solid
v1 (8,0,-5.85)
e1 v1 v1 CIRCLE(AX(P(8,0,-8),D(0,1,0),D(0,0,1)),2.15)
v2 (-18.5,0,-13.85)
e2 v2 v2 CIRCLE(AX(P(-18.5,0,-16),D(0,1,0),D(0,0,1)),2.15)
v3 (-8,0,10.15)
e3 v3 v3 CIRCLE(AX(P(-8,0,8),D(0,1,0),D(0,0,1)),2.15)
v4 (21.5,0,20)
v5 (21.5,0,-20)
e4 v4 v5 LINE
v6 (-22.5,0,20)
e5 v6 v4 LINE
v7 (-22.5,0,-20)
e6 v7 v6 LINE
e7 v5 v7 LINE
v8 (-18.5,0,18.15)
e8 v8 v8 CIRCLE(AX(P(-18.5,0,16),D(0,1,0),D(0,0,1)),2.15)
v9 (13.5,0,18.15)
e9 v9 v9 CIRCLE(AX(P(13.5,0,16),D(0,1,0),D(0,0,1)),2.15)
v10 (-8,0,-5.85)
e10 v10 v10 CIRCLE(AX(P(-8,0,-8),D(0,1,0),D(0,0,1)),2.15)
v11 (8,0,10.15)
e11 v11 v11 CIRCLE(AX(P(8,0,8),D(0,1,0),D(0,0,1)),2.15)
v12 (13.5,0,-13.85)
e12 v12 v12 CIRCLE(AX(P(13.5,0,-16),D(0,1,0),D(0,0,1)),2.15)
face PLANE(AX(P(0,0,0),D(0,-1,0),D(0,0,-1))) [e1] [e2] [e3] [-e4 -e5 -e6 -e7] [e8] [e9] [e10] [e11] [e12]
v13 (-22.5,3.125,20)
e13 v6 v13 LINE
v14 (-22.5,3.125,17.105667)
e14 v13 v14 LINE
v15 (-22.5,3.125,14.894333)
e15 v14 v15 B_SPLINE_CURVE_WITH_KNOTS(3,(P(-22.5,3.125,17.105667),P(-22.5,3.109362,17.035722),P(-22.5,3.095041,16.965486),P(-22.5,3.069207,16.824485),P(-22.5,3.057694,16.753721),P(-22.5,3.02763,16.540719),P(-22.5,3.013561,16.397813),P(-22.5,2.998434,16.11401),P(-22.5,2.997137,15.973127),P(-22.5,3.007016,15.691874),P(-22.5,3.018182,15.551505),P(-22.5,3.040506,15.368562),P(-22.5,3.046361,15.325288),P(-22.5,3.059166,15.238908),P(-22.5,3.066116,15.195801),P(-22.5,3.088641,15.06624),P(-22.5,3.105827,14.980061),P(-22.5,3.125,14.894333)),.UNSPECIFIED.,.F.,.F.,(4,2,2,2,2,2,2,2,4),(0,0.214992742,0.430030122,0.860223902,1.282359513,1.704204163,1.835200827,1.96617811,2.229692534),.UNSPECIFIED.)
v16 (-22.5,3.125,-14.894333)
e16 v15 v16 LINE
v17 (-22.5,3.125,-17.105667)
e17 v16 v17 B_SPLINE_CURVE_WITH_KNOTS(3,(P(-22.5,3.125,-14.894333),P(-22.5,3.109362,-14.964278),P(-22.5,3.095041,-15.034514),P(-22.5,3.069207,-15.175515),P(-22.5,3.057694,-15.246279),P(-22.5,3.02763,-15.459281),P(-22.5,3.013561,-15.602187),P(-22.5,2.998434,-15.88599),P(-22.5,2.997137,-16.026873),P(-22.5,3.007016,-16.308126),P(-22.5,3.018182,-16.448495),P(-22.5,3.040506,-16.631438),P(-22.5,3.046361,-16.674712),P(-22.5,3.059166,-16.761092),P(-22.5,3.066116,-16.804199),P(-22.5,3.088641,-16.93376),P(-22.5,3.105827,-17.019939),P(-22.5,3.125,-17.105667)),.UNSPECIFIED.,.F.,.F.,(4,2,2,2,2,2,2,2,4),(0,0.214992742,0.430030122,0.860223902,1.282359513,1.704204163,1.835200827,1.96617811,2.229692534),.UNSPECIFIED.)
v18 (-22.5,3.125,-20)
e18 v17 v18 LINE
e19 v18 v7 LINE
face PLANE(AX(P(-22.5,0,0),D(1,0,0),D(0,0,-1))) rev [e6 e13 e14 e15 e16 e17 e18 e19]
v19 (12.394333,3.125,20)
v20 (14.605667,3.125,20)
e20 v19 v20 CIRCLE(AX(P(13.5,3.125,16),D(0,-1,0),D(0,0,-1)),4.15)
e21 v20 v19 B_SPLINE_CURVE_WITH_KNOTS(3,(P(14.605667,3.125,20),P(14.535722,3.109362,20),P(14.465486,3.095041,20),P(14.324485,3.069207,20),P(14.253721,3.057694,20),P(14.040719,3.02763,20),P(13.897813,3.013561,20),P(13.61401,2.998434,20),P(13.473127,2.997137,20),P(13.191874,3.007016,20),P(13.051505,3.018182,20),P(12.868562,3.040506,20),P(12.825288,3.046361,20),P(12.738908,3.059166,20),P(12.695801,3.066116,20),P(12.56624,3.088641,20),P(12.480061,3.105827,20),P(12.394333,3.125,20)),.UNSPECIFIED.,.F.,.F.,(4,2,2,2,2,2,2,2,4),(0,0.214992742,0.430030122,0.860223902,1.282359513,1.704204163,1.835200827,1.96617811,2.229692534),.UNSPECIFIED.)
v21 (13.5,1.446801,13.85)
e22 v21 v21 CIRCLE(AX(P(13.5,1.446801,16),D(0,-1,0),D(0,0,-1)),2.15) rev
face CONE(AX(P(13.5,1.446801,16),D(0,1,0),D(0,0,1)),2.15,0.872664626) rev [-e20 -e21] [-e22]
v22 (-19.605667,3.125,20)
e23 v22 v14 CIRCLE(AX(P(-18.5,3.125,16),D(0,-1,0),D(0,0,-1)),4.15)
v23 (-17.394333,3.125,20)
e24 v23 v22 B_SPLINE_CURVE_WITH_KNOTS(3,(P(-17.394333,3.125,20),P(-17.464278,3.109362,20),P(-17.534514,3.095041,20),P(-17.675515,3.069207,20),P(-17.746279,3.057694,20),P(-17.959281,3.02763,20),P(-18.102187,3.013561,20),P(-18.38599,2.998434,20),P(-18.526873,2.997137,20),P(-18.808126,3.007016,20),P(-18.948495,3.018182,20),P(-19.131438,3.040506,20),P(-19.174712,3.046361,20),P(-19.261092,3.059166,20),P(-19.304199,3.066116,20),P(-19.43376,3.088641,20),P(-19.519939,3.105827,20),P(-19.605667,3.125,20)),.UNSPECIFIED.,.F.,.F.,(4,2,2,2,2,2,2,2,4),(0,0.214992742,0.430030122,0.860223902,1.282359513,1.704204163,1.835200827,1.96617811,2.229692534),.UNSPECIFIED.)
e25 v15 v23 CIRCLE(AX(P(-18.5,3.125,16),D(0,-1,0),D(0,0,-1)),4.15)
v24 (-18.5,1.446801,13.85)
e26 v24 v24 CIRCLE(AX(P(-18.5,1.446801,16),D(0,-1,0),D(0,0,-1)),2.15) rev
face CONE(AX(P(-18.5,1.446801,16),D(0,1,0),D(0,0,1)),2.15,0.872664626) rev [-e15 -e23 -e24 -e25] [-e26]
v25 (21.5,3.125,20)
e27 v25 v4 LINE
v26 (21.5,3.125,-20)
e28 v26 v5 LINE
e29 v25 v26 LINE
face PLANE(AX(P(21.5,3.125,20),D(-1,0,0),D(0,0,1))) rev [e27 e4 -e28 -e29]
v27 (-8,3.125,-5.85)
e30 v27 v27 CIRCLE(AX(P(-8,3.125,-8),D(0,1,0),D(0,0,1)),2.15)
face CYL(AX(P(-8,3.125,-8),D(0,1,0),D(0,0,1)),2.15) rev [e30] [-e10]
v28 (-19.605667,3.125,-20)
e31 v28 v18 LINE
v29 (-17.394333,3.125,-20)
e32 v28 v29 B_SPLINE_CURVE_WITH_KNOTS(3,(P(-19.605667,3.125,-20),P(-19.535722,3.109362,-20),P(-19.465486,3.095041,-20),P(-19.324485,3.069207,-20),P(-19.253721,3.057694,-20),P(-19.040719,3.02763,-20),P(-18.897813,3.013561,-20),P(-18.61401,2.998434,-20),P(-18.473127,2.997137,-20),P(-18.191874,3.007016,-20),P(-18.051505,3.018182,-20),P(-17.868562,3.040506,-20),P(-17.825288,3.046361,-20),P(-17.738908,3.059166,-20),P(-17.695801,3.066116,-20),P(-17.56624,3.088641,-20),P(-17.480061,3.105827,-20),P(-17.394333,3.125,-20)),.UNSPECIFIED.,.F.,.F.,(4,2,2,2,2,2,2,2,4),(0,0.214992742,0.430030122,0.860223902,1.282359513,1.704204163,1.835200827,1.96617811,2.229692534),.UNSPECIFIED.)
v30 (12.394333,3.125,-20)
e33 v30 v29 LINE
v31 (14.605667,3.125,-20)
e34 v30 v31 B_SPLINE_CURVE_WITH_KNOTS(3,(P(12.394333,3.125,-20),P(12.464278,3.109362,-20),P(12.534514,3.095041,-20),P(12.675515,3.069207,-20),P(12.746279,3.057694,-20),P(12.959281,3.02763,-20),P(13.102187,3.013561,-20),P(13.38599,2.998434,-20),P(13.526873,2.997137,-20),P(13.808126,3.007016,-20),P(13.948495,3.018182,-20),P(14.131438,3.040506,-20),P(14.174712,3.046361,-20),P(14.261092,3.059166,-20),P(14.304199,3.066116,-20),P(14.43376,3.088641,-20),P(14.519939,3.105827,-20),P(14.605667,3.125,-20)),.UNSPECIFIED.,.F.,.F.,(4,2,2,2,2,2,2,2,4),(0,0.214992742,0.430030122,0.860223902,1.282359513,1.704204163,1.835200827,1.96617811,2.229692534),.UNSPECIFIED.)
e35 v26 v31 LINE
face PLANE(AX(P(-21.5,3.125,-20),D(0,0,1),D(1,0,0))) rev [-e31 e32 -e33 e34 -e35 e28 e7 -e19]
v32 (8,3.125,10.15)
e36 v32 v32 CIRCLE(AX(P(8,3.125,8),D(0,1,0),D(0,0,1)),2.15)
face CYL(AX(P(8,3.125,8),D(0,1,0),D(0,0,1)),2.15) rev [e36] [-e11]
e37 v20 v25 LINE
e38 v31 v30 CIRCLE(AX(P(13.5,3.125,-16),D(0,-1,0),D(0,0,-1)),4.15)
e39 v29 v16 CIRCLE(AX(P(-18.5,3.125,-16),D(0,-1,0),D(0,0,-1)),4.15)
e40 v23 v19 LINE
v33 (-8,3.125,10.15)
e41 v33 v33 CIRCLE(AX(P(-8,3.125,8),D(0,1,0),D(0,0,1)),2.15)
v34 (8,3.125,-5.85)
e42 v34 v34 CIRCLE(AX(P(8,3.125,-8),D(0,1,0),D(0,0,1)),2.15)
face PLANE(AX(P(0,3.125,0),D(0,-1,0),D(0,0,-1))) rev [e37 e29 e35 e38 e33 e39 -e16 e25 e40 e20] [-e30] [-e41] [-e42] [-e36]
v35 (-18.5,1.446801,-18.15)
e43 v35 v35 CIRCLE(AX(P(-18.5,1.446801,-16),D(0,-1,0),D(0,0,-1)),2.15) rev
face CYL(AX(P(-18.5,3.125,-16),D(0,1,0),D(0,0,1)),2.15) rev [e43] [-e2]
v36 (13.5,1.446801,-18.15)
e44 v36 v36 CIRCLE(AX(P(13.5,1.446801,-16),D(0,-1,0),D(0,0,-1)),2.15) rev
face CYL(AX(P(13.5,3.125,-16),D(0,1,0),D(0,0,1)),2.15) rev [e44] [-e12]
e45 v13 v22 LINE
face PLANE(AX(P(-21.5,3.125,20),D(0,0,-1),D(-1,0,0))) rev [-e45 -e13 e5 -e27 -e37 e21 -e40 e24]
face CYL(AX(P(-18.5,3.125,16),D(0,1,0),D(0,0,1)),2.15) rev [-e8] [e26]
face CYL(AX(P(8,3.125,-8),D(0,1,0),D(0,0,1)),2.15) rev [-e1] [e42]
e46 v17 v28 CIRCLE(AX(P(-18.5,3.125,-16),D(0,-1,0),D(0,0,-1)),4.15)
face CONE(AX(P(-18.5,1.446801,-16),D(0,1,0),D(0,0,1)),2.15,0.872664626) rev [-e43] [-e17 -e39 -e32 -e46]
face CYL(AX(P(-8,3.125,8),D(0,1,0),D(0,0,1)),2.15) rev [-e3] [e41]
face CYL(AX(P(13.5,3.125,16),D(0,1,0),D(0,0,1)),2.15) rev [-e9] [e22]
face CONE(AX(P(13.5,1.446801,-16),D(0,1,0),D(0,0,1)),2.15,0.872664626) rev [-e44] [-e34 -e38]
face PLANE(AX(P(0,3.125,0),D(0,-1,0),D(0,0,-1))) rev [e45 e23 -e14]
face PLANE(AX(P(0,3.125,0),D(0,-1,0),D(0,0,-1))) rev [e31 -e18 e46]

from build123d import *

# Parameters (mm, degrees)
SKETCH1_W            = 43
SKETCH1_H            = 40
BOSS_EXTRUDE1_DEPTH  = 3.125
M4_CLEARANCE_HOLE1_D = 4.3
M4_CLEARANCE_HOLE2_D = 4.3
SKETCH7_W            = 40
SKETCH7_H            = 3.125
BOSS_EXTRUDE2_DEPTH  = 1
CHAMFER1_SIZE        = 2
CHAMFER1_SIZE_2      = 1.678199262


with BuildPart() as part:
    # Sketch1 → Boss-Extrude1 (new body)
    with BuildSketch(Plane(origin=(0, 0, 0), x_dir=(1, 0, 0), z_dir=(0, 1, 0))):
        Rectangle(SKETCH1_W, SKETCH1_H)
    extrude(amount=BOSS_EXTRUDE1_DEPTH)

    # M4 Clearance Hole1 (through all)
    with Locations(Plane(origin=(0, 3.125, 0), x_dir=(1, 0, 0), z_dir=(0, 1, 0))):
        with Locations((-18.5, 16), (13.5, 16), (13.5, -16), (-18.5, -16)):
            Hole(M4_CLEARANCE_HOLE1_D / 2)

    # M4 Clearance Hole2 (through all)
    with Locations(Plane(origin=(0, 3.125, 0), x_dir=(1, 0, 0), z_dir=(0, 1, 0))):
        with Locations((-8, 8), (8, 8), (8, -8), (-8, -8)):
            Hole(M4_CLEARANCE_HOLE2_D / 2)

    # Sketch7 → Boss-Extrude2 (add)
    with BuildSketch(Plane.ZY.offset(21.5)):
        with Locations((0, 1.5625)):
            Rectangle(SKETCH7_W, SKETCH7_H)
    extrude(amount=BOSS_EXTRUDE2_DEPTH)

    # Chamfer1
    # the kernel refuses this chamfer: 2, 1.678199262 mm, written as the material it takes off along each edge
    with BuildSketch(Plane(origin=(-18.5, 3.125, 16), x_dir=(-1, 0, 0), z_dir=(0, 0, 1))) as chamfer1_piece_1:
        Polygon((2.15 + CHAMFER1_SIZE, 0), (2.15, CHAMFER1_SIZE_2), (2.15, 0), align=None)
    revolve(axis=Axis((-18.5, 3.125, 16), (0, -1, 0)), mode=Mode.SUBTRACT)
    with BuildSketch(Plane(origin=(13.5, 3.125, 16), x_dir=(-1, 0, 0), z_dir=(0, 0, 1))) as chamfer1_piece_2:
        Polygon((2.15 + CHAMFER1_SIZE, 0), (2.15, CHAMFER1_SIZE_2), (2.15, 0), align=None)
    revolve(axis=Axis((13.5, 3.125, 16), (0, -1, 0)), mode=Mode.SUBTRACT)
    with BuildSketch(Plane(origin=(13.5, 3.125, -16), x_dir=(-1, 0, 0), z_dir=(0, 0, 1))) as chamfer1_piece_3:
        Polygon((2.15 + CHAMFER1_SIZE, 0), (2.15, CHAMFER1_SIZE_2), (2.15, 0), align=None)
    revolve(axis=Axis((13.5, 3.125, -16), (0, -1, 0)), mode=Mode.SUBTRACT)
    with BuildSketch(Plane(origin=(-18.5, 3.125, -16), x_dir=(-1, 0, 0), z_dir=(0, 0, 1))) as chamfer1_piece_4:
        Polygon((2.15 + CHAMFER1_SIZE, 0), (2.15, CHAMFER1_SIZE_2), (2.15, 0), align=None)
    revolve(axis=Axis((-18.5, 3.125, -16), (0, -1, 0)), mode=Mode.SUBTRACT)


solid = part.part
